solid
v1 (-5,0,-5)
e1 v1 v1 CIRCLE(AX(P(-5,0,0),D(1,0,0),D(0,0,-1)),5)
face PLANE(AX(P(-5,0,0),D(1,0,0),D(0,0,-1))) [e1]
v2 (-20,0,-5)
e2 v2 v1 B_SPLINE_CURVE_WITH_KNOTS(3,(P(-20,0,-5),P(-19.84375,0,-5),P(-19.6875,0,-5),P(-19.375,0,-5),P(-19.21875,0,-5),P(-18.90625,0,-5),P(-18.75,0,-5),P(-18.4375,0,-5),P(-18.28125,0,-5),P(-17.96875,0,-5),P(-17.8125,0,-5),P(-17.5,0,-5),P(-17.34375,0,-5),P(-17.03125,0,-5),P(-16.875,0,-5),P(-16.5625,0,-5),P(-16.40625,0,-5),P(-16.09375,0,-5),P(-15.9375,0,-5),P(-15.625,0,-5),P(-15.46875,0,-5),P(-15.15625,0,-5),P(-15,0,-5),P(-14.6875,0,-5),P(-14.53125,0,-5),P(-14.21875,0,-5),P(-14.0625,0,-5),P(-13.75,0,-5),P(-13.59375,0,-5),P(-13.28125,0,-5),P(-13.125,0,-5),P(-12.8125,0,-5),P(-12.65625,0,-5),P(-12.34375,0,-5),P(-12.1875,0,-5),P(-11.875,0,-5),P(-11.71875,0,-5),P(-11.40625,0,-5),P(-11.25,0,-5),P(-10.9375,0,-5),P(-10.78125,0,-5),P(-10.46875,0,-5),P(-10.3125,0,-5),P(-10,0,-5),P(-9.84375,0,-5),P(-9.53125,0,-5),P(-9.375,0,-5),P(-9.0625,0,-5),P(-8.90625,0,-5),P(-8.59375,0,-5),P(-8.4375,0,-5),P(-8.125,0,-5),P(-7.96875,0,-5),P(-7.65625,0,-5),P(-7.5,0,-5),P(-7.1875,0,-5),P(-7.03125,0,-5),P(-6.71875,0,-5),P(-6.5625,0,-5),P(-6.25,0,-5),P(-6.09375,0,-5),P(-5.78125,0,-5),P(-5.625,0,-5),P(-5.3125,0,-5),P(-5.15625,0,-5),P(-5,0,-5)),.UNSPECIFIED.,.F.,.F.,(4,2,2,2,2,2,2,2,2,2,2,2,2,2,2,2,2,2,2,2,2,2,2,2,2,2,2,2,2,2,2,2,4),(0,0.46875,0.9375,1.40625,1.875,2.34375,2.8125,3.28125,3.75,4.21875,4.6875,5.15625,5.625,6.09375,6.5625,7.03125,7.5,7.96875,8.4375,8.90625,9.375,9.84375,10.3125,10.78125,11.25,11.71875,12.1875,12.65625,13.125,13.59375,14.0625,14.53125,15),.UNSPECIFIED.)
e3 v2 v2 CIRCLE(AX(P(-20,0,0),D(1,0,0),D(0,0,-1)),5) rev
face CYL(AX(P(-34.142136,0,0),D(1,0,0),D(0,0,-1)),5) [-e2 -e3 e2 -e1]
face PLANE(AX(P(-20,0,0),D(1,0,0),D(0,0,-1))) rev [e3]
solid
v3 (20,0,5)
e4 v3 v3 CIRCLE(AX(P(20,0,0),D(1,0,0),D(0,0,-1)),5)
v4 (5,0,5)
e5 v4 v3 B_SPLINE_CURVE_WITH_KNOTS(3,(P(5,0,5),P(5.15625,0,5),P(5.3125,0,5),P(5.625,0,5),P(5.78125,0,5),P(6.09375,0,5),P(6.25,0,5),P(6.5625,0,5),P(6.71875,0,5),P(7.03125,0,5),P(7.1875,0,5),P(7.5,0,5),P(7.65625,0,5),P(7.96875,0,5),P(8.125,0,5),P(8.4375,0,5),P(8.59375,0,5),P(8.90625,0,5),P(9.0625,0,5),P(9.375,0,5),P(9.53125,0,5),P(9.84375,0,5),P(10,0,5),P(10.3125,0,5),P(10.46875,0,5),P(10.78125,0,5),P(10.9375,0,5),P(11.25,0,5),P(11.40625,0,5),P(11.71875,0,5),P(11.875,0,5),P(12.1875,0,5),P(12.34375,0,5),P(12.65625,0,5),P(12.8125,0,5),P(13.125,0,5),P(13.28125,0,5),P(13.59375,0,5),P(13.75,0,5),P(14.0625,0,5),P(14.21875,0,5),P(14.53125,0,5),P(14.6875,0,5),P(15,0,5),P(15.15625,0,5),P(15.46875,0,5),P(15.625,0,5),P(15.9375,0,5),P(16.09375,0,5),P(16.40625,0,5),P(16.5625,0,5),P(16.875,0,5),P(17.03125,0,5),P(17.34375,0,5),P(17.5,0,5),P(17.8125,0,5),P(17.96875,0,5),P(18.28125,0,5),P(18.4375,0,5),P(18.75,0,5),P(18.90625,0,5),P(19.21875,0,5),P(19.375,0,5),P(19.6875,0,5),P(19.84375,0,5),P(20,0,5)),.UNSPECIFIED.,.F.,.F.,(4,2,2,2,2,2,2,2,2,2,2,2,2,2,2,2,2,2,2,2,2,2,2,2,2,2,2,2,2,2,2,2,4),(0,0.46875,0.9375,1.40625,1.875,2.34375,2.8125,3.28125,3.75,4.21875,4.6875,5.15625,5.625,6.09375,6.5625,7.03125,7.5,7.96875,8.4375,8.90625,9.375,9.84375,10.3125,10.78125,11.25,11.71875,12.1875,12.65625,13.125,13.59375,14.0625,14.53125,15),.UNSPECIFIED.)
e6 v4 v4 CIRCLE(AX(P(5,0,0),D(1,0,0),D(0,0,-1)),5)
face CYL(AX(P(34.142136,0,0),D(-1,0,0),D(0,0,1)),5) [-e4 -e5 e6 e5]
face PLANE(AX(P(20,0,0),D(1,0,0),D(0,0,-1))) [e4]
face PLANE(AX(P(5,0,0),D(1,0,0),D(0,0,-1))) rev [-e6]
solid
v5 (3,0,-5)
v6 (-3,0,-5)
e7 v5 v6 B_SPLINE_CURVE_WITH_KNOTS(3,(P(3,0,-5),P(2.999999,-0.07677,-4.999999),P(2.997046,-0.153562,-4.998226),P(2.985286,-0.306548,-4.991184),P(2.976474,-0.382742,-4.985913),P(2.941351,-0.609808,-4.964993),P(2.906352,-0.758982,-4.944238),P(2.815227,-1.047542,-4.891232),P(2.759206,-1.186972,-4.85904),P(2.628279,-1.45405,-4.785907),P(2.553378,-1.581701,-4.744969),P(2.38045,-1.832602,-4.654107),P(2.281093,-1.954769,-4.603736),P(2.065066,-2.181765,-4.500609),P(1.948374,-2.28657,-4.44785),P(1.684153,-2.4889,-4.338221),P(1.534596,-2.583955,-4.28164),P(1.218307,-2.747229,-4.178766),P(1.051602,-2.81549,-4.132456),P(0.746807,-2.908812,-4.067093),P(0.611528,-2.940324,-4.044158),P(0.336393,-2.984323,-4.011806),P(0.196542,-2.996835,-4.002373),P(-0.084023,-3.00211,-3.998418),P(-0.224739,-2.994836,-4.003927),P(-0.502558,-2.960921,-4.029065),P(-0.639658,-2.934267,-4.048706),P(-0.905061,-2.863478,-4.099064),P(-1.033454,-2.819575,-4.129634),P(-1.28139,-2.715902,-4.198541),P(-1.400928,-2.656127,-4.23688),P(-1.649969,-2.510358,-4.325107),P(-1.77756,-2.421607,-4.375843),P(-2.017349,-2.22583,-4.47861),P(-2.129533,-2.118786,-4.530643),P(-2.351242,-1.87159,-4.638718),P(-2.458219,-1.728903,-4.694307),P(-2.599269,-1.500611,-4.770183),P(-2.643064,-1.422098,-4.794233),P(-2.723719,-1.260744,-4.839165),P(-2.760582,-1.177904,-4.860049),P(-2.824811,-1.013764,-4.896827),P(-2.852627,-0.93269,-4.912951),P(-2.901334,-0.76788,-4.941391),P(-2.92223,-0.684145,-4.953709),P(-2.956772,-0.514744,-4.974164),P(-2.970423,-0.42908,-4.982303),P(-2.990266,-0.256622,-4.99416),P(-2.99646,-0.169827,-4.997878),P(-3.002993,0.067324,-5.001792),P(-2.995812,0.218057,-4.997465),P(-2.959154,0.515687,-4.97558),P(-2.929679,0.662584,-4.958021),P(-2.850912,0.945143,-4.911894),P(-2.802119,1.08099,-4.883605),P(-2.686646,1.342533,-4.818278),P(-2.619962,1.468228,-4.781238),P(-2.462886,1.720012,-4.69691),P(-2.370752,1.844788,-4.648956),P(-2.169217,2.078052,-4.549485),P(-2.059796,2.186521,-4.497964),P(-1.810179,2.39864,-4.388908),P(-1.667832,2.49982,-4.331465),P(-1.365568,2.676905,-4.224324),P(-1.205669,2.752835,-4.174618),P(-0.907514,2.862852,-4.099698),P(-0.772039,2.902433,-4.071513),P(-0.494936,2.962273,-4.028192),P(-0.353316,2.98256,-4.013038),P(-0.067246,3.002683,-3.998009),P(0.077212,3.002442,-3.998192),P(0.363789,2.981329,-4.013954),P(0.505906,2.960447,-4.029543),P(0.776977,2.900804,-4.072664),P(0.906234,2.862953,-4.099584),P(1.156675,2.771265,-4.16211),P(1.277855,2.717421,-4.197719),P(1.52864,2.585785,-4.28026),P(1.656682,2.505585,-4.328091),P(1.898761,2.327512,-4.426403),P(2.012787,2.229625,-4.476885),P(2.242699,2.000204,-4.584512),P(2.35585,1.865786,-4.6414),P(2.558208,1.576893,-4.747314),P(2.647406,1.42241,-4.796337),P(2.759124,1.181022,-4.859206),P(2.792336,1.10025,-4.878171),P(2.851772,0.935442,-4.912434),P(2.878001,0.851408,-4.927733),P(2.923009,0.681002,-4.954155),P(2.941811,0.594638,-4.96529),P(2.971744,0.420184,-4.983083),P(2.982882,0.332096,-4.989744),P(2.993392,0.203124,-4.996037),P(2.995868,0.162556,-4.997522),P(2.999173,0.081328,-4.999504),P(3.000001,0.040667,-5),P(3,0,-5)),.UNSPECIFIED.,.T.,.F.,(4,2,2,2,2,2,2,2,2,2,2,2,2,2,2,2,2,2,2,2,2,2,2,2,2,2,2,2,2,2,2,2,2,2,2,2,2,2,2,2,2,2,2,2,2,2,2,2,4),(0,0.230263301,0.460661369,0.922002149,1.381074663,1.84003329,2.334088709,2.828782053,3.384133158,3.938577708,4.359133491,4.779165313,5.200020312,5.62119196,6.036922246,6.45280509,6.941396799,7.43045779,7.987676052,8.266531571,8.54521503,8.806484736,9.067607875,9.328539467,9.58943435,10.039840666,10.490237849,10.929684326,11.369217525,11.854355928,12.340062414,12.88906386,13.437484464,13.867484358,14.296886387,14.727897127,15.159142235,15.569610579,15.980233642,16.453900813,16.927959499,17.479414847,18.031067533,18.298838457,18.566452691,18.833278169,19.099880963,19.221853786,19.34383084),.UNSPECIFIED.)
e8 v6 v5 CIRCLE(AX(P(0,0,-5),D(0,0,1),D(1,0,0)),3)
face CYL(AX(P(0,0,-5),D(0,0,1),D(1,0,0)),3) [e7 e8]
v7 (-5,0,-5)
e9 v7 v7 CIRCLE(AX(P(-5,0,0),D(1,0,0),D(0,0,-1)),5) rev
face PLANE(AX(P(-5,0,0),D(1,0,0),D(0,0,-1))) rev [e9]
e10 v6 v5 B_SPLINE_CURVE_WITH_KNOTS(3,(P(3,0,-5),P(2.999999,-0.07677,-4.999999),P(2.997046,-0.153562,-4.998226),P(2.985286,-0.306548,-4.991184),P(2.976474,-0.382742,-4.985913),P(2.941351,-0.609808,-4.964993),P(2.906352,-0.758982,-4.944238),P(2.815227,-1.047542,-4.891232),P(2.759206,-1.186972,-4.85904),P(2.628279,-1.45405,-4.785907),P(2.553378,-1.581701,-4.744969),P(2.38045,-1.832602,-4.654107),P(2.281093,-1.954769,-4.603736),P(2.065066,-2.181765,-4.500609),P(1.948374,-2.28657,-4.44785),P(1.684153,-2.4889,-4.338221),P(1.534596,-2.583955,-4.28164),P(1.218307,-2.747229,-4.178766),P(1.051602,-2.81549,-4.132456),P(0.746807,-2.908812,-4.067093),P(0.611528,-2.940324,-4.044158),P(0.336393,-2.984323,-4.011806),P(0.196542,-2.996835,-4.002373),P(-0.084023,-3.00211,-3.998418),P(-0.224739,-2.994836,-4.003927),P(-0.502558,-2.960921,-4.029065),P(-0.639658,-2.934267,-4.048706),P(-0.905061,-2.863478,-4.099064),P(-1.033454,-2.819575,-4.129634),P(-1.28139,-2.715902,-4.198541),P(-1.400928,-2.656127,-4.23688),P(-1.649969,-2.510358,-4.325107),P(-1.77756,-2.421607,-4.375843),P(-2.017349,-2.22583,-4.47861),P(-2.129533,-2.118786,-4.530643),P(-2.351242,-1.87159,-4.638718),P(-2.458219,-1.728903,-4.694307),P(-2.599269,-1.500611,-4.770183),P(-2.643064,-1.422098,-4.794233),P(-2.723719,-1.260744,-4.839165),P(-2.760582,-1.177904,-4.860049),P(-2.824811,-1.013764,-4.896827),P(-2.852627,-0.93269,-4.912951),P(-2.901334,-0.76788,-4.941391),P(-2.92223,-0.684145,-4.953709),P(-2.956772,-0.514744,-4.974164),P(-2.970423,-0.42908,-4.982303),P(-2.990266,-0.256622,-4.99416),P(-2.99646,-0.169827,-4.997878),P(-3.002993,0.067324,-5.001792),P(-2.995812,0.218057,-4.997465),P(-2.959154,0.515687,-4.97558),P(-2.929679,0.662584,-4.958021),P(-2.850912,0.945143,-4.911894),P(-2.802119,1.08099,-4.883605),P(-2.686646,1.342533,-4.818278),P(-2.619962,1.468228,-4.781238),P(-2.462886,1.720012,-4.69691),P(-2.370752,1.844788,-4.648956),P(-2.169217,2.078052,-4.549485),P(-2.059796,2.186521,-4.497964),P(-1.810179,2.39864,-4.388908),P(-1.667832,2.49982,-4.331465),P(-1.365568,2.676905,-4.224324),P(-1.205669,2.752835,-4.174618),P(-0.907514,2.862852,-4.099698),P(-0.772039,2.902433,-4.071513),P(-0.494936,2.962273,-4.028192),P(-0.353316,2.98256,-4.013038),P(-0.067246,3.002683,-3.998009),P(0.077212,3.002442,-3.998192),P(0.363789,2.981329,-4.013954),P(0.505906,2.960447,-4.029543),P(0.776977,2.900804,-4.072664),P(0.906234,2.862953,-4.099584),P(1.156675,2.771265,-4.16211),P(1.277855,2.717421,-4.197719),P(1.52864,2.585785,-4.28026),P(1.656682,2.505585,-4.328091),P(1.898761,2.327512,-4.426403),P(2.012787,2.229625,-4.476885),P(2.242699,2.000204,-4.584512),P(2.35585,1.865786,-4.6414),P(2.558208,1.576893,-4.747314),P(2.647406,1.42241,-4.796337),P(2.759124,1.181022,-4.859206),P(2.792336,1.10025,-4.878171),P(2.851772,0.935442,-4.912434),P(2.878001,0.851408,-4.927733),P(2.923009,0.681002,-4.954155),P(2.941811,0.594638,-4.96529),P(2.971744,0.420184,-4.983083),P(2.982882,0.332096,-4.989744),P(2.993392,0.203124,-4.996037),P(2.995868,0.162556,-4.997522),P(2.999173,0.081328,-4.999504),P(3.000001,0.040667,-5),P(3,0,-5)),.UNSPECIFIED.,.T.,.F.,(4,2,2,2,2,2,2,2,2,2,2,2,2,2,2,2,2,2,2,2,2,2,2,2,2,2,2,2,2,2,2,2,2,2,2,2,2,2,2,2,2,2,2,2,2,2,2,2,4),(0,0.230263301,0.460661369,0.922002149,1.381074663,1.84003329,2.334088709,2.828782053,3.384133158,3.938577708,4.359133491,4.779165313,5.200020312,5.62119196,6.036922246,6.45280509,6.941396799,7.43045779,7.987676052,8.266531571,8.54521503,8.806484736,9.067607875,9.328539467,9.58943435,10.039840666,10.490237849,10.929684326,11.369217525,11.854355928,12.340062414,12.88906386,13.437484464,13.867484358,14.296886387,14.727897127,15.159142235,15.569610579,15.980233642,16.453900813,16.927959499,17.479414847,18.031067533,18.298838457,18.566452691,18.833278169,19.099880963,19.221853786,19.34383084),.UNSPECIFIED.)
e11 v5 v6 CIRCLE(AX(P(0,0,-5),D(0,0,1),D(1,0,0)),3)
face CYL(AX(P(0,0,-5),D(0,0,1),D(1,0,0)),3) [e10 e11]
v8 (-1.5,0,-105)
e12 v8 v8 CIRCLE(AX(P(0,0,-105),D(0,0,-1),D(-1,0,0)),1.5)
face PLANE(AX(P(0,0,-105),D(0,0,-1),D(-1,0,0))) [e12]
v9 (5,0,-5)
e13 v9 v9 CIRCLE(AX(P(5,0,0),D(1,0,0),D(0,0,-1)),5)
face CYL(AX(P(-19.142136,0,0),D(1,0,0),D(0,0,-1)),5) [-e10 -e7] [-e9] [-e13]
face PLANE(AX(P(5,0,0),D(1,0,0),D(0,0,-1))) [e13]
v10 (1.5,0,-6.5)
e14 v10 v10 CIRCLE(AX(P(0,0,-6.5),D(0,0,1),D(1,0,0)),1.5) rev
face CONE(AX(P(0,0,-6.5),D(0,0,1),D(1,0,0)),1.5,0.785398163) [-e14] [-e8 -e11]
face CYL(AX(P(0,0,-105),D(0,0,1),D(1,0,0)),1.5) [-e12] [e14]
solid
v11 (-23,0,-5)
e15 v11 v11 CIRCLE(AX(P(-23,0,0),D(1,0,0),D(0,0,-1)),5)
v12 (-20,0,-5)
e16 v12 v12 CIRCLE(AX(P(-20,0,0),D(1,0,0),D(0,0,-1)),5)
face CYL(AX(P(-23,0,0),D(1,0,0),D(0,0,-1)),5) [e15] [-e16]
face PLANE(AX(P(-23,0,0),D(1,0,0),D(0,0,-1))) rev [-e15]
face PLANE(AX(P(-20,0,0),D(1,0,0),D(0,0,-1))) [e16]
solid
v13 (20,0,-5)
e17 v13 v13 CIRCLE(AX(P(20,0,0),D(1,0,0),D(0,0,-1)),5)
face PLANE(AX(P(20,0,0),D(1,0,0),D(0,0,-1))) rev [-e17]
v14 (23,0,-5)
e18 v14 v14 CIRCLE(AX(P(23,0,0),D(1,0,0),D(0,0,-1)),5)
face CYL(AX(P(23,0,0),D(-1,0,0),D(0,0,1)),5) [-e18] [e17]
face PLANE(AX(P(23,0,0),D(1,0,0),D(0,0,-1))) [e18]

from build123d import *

# Parameters (mm, degrees)
OUTER_START                = 20
CONNECTOR_PIN_SKETCH_R     = 5
OUTER_PIN_EXTRUDE_1_DEPTH  = 3
OUTER_START_2              = -20
CONNECTOR_PIN_SKETCH_2_R   = 5
OUTER_PIN_EXTRUDE_2_DEPTH  = 3
MIDDLE_START               = 5
CONNECTOR_PIN_SKETCH_3_R   = 5
MIDDLE_PIN_EXTRUDE_1_DEPTH = 15
MIDDLE_START_2             = -5
CONNECTOR_PIN_SKETCH_4_R   = 5
MIDDLE_PIN_EXTRUDE_2_DEPTH = 15
CENTER_START               = -5
CONNECTOR_PIN_SKETCH_5_R   = 5
CENTER_PIN_EXTRUDE_DEPTH   = 10
T_JOINT_SKETCH_R           = 3
T_JOINT_EXTRUDE_DEPTH      = 5
PLUNGER_SKETCH_R           = 1.5
PLUNGER_EXTRUDE_DEPTH      = 100
PLUNGER_CHAMFER_SIZE       = 1.5


with BuildPart() as part:
    # Connector Pin Sketch → Outer Pin Extrude 1 (new body)
    with BuildSketch(Plane(origin=(0, 0, 0), x_dir=(0, 0, -1), z_dir=(1, 0, 0)).offset(OUTER_START)):
        Circle(CONNECTOR_PIN_SKETCH_R)
    extrude(amount=OUTER_PIN_EXTRUDE_1_DEPTH)


with BuildPart() as body_2:
    # Connector Pin Sketch<2> → Outer Pin Extrude 2 (new body)
    with BuildSketch(Plane(origin=(0, 0, 0), x_dir=(0, 0, -1), z_dir=(1, 0, 0)).offset(OUTER_START_2)):
        Circle(CONNECTOR_PIN_SKETCH_2_R)
    extrude(amount=-OUTER_PIN_EXTRUDE_2_DEPTH)


with BuildPart() as body_3:
    # Connector Pin Sketch<3> → Middle Pin Extrude 1 (new body)
    with BuildSketch(Plane(origin=(0, 0, 0), x_dir=(0, 0, -1), z_dir=(1, 0, 0)).offset(MIDDLE_START)):
        with Locations(Location((0, 0, 0), (0, 0, 180))):
            Circle(CONNECTOR_PIN_SKETCH_3_R)
    extrude(amount=MIDDLE_PIN_EXTRUDE_1_DEPTH)


with BuildPart() as body_4:
    # Connector Pin Sketch<4> → Middle Pin Extrude 2 (new body)
    with BuildSketch(Plane(origin=(0, 0, 0), x_dir=(0, 0, -1), z_dir=(1, 0, 0)).offset(MIDDLE_START_2)):
        Circle(CONNECTOR_PIN_SKETCH_4_R)
    extrude(amount=-MIDDLE_PIN_EXTRUDE_2_DEPTH)


with BuildPart() as body_5:
    # Connector Pin Sketch<5> → Center Pin Extrude (new body)
    with BuildSketch(Plane(origin=(0, 0, 0), x_dir=(0, 0, -1), z_dir=(1, 0, 0)).offset(CENTER_START)):
        Circle(CONNECTOR_PIN_SKETCH_5_R)
    extrude(amount=CENTER_PIN_EXTRUDE_DEPTH)

    # T Joint Sketch → T Joint Extrude (add)
    with BuildSketch(Plane.XY):
        Circle(T_JOINT_SKETCH_R)
    extrude(amount=-T_JOINT_EXTRUDE_DEPTH)

    # Plunger Sketch → Plunger Extrude (add)
    with BuildSketch(Plane(origin=(0, 0, -5), x_dir=(-1, 0, 0), z_dir=(0, 0, -1))):
        with Locations(Location((0, 0, 0), (0, 0, 180))):
            Circle(PLUNGER_SKETCH_R)
    extrude(amount=PLUNGER_EXTRUDE_DEPTH)

    # Plunger Chamfer
    plunger_chamfer_edges = [body_5.edges().sort_by_distance(p)[0] for p in [
        (-1.5, 0, -5),
    ]]
    chamfer(plunger_chamfer_edges, length=PLUNGER_CHAMFER_SIZE - 0.0001)  # a hair under: the kernel refuses the full size


solid = Compound([part.part, body_2.part, body_3.part, body_4.part, body_5.part])
